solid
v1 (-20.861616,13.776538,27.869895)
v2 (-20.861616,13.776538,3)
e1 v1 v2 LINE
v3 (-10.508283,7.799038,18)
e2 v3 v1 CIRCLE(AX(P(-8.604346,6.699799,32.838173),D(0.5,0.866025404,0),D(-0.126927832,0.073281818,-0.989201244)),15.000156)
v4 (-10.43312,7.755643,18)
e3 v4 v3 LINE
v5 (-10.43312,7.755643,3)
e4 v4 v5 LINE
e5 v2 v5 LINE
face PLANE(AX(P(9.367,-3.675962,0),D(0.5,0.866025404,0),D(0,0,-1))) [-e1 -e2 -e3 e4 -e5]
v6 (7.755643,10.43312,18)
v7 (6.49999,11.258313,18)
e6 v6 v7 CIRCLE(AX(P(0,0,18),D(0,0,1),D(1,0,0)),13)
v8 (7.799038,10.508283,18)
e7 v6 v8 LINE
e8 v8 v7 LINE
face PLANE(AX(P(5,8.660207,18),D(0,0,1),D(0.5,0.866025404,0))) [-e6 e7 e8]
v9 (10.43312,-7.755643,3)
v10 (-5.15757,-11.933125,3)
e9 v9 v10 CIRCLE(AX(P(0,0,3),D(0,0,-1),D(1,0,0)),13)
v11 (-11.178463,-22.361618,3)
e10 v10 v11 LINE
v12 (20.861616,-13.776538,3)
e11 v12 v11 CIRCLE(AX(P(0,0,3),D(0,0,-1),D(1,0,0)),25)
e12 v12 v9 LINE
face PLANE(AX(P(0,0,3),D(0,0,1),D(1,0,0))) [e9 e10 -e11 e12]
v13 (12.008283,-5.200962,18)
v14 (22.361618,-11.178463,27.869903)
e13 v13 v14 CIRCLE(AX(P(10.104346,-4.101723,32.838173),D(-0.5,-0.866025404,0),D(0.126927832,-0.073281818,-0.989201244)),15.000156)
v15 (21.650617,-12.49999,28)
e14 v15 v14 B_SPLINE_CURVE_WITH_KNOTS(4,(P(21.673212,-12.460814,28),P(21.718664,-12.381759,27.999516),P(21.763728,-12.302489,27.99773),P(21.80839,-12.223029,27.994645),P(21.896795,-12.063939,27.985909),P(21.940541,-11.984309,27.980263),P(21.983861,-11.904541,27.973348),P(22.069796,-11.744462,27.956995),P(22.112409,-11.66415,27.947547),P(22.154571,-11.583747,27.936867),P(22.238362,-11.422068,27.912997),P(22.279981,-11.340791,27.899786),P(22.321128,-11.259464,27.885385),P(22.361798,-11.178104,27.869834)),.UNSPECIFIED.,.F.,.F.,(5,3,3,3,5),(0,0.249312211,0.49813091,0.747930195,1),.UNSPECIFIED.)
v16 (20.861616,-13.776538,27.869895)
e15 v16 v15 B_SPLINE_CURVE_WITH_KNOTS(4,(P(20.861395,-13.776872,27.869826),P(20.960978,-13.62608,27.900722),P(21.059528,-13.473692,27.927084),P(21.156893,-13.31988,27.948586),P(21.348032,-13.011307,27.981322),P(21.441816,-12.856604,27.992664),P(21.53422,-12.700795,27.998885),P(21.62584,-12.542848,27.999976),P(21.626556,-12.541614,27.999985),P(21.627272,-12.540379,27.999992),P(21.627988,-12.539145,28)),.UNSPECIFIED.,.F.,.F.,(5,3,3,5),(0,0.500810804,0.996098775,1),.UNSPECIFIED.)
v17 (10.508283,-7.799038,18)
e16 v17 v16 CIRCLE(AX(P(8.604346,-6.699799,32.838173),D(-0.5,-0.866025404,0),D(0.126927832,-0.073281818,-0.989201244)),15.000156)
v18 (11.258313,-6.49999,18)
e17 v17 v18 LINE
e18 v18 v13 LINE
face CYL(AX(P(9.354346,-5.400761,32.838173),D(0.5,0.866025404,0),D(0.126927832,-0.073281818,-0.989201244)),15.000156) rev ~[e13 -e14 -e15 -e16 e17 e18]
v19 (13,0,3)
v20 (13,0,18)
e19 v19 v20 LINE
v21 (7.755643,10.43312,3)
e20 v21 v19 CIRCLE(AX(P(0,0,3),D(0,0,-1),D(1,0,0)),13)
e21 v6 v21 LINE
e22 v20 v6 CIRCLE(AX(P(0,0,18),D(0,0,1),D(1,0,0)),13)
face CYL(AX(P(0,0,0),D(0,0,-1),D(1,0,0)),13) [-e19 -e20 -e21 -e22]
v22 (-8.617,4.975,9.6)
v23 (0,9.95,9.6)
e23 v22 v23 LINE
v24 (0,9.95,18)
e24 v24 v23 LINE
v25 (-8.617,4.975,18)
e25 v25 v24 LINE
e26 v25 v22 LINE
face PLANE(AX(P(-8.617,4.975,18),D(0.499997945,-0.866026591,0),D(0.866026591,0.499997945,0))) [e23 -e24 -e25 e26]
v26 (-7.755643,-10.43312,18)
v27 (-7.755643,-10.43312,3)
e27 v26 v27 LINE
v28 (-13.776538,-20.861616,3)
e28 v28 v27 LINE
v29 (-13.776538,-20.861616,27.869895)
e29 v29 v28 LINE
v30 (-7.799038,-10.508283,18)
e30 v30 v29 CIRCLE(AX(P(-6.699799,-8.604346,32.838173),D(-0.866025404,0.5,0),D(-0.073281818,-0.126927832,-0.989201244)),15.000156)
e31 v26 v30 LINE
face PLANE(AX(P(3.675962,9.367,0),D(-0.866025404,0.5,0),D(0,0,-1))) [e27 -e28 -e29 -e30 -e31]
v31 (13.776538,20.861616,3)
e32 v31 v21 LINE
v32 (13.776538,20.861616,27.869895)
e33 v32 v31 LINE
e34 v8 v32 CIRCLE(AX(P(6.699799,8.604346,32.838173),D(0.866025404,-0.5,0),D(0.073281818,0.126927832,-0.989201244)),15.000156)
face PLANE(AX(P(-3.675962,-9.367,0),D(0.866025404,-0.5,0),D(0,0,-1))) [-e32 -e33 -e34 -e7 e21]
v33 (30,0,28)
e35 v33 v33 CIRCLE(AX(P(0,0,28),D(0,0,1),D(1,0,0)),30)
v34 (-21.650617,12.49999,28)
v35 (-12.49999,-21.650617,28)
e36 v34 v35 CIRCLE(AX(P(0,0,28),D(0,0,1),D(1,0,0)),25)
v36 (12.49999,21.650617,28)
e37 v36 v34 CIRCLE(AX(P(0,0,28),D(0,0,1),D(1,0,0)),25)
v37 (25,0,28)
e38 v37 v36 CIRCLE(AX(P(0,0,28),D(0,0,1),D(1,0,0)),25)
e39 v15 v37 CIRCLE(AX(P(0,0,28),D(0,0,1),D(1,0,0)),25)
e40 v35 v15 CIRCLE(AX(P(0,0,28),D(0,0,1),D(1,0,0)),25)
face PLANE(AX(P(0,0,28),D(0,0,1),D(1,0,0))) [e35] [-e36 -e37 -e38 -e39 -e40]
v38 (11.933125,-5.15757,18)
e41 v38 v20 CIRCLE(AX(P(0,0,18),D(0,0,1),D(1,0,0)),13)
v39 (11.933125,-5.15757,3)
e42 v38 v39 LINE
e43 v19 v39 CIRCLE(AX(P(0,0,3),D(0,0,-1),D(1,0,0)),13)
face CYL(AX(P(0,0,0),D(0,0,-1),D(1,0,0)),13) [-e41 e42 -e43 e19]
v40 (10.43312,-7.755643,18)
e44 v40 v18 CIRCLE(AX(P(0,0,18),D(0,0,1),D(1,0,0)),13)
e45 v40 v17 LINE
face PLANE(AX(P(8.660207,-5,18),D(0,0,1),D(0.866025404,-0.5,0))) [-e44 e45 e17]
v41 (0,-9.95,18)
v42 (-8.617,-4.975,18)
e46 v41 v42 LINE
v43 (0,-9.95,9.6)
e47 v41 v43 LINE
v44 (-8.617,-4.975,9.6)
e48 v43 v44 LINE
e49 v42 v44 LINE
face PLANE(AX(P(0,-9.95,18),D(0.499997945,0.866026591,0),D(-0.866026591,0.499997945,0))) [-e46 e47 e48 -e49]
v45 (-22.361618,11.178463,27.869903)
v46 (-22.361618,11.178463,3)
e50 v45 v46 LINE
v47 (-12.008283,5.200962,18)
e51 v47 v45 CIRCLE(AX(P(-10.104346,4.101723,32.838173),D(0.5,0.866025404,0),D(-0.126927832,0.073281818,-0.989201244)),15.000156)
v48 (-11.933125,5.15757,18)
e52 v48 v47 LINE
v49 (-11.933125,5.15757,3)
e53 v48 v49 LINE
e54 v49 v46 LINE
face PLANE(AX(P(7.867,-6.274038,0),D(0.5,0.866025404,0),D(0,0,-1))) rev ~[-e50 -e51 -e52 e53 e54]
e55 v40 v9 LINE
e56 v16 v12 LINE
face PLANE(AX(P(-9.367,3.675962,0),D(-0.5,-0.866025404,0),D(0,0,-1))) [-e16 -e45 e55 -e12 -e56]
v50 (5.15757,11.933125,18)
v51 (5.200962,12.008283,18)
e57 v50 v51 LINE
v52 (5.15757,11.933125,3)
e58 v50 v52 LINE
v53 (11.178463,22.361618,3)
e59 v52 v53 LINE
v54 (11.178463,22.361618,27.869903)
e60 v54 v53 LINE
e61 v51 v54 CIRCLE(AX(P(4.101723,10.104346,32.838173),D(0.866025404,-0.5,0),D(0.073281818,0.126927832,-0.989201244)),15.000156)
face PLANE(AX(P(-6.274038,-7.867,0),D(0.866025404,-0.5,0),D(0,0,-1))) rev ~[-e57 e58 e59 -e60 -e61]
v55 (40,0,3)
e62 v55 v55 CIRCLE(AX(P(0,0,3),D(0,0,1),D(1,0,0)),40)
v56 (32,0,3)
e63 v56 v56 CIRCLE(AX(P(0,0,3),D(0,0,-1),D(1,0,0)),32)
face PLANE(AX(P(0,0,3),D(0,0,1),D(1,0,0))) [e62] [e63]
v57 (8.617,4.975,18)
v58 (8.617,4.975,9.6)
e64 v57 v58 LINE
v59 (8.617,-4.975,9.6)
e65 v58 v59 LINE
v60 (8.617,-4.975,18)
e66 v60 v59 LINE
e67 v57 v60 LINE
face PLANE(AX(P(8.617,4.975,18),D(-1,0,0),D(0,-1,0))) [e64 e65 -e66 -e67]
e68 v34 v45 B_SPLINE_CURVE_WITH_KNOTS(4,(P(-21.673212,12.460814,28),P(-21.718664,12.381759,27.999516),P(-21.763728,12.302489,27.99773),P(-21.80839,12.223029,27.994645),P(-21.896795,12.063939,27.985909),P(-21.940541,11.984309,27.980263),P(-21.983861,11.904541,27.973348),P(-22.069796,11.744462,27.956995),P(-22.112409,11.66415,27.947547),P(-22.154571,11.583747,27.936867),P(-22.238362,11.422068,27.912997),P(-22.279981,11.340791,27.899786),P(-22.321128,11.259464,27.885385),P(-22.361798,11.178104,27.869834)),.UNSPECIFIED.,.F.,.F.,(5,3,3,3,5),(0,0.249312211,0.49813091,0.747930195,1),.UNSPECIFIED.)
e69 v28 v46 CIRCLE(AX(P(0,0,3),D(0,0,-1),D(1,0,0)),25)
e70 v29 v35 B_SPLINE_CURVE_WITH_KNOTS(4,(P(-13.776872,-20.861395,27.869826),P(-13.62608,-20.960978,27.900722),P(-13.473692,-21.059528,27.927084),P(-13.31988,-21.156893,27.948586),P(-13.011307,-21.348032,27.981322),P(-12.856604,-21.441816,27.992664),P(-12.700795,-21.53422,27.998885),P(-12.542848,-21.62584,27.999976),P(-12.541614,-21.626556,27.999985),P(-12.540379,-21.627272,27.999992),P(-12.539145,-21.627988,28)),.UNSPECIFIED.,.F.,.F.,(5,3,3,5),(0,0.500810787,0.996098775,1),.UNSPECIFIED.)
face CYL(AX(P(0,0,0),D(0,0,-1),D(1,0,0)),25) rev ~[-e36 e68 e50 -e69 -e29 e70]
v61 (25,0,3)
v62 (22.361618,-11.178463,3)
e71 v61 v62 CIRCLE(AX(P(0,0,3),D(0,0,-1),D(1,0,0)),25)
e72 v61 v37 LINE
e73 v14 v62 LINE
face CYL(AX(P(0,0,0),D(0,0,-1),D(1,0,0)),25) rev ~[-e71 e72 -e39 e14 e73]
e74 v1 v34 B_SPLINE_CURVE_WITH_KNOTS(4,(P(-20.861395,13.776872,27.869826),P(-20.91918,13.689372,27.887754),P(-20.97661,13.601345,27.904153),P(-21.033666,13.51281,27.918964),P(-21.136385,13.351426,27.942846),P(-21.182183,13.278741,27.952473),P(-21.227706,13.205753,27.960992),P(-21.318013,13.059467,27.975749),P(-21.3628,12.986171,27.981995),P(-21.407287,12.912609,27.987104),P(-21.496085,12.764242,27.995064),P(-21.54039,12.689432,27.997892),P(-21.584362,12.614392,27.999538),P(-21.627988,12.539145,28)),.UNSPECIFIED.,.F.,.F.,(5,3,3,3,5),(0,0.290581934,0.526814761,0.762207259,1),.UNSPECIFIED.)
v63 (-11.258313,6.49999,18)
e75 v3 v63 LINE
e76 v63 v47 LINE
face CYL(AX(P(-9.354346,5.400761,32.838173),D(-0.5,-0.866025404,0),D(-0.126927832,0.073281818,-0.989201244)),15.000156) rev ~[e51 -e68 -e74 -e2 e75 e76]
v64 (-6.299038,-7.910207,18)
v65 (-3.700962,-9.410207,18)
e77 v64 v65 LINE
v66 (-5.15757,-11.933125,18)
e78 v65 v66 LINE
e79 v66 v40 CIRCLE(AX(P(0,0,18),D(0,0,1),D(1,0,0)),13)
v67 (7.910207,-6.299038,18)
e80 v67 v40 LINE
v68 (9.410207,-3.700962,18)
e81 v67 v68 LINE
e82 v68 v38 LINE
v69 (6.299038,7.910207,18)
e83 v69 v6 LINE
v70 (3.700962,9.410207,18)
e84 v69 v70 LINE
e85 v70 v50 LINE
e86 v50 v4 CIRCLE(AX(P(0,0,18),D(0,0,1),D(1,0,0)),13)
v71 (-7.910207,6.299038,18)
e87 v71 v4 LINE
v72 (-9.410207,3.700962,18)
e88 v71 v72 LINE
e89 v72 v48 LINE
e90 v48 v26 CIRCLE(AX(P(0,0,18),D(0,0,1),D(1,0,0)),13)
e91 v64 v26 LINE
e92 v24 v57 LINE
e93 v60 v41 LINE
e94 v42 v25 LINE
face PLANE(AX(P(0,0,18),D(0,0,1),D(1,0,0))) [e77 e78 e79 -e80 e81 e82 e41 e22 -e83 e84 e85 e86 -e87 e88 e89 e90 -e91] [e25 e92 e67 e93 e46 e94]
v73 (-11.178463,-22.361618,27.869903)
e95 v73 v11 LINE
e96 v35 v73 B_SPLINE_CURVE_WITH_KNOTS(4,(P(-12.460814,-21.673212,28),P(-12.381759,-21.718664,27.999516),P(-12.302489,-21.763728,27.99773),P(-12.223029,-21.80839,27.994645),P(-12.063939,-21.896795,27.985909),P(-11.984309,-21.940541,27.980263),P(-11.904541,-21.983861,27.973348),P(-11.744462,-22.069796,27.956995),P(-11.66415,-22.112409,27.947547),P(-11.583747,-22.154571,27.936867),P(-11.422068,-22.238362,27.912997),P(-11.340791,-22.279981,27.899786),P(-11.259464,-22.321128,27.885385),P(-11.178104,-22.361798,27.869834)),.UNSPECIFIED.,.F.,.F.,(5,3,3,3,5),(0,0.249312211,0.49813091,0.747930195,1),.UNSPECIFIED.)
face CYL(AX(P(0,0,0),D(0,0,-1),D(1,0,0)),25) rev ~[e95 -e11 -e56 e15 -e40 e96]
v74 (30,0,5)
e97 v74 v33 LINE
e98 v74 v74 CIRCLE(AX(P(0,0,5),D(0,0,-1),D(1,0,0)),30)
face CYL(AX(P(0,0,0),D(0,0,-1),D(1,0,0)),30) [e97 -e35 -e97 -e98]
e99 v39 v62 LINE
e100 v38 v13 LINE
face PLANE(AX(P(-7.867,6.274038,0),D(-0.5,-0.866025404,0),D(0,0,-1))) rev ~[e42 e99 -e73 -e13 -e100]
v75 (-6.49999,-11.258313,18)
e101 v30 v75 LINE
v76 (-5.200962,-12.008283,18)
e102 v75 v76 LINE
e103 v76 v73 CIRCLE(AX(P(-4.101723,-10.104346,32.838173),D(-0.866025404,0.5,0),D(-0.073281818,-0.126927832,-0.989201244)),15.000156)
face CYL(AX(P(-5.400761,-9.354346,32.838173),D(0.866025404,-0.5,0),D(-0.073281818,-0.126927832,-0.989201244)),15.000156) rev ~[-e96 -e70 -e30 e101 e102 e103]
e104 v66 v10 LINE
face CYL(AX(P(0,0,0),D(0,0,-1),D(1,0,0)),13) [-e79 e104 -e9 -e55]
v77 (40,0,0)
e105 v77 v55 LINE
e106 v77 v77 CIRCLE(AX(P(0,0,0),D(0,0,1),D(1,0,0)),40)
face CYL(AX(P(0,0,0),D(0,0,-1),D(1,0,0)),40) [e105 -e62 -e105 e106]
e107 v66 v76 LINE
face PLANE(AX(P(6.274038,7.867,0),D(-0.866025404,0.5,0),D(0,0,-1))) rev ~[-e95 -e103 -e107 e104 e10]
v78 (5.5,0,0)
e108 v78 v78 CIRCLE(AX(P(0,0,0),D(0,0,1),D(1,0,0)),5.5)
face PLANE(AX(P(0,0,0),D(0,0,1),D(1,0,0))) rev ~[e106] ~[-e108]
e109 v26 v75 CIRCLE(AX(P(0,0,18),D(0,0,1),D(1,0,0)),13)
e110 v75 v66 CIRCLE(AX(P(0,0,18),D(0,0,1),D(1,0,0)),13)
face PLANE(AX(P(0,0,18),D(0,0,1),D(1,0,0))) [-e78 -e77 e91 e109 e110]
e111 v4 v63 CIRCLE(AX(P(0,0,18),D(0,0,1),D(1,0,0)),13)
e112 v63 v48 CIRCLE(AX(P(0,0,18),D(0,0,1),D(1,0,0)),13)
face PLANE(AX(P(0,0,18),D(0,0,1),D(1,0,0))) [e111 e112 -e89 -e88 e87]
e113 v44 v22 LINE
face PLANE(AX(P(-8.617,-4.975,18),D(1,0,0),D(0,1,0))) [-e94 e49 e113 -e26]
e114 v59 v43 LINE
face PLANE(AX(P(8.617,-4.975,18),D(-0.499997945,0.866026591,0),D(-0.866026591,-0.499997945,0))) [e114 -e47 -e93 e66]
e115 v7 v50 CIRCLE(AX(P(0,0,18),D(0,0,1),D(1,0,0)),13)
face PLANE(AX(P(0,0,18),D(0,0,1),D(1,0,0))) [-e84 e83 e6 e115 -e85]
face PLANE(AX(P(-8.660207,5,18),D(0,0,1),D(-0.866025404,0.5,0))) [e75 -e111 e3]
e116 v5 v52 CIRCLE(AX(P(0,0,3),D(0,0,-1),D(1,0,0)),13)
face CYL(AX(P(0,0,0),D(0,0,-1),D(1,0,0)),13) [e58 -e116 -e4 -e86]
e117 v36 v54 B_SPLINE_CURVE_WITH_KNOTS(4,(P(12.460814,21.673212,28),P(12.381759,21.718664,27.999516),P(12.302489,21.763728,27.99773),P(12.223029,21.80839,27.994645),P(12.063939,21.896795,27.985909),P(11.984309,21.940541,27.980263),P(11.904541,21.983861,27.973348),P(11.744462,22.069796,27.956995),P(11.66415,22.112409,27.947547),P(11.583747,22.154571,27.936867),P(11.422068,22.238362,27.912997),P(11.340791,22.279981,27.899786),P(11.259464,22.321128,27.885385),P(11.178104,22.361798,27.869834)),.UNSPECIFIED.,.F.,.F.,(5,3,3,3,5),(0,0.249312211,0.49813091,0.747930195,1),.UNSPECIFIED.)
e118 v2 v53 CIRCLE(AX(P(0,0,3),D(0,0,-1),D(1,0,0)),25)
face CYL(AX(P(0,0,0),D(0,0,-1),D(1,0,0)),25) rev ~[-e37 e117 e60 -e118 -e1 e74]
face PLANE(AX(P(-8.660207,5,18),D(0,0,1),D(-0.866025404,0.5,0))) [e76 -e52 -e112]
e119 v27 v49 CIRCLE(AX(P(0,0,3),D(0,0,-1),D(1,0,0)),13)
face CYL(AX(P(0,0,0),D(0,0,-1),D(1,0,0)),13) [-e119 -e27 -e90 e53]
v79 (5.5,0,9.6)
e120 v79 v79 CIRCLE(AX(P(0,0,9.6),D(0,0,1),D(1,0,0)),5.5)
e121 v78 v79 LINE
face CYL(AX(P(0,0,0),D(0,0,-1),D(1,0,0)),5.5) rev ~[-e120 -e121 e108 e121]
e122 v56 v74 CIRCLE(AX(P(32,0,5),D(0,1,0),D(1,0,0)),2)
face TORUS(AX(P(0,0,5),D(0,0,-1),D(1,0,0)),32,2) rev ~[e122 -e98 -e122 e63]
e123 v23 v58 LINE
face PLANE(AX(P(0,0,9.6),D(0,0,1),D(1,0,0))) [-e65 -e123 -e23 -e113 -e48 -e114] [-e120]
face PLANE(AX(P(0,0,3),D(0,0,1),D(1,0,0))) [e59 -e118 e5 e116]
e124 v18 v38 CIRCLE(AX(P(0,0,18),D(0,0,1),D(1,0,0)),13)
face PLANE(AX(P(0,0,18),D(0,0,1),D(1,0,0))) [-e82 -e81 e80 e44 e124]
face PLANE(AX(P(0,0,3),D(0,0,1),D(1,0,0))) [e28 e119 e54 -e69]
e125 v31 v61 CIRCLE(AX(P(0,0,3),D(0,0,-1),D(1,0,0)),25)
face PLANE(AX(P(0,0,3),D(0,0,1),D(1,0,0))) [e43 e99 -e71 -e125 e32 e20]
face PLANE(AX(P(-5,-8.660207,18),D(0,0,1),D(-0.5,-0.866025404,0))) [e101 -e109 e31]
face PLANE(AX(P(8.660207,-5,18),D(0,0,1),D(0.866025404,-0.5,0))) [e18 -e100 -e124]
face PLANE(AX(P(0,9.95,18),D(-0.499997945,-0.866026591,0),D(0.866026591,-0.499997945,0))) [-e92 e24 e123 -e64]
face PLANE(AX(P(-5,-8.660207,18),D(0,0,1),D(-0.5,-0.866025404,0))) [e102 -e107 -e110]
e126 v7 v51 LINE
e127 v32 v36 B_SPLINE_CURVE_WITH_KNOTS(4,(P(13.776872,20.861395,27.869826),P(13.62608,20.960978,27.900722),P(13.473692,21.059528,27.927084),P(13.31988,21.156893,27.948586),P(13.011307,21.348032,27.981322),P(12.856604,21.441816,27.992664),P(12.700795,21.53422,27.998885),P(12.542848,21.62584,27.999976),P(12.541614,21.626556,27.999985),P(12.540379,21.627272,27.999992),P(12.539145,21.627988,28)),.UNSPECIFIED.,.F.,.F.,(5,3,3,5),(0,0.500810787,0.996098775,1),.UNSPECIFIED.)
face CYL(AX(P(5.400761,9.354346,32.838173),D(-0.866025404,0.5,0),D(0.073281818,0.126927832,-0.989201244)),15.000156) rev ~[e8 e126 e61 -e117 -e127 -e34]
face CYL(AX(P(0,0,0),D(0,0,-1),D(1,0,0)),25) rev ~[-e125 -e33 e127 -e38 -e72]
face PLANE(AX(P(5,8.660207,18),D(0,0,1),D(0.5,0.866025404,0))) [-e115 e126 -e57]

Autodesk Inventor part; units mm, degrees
ref_plane "YZ Plane" through (0, 0, 0) normal (1, 0, 0) x (0, 1, 0)
ref_plane "XZ Plane" through (0, 0, 0) normal (0, 1, 0) x (-1, 0, 0)
sketch "Sketch1" plane through (0, 0, 0) normal (0, 0, 1) x (1, 0, 0)
  circle A0 centre (0, 0) radius 30
  circle A1 centre (0, 0) radius 40
  circle A2 centre (0, 0) radius 25
  circle A3 centre (0, 0) radius 13
  circle A4 centre (0, 0) radius 5.5
  circle A5 centre (0, 0) radius 9.95 construction
  line L0 (0, 9.95) -> (8.617, 4.975)
  line L1 (8.617, 4.975) -> (8.617, -4.975)
  line L2 (8.617, -4.975) -> (0, -9.95)
  line L3 (0, -9.95) -> (-8.617, -4.975)
  line L4 (-8.617, -4.975) -> (-8.617, 4.975)
  line L5 (-8.617, 4.975) -> (0, 9.95)
  line L6 (0, 9.95) -> (0, -9.95) construction
  dimension "bolt_head_hub_WAC" = 19.9
  dimension "wheel_diam" = 60
  dimension "d1" = 80
  dimension "d4" = 50
  dimension "d5" = 26
  dimension "hub_id" = 11
extrude "Extrusion1" add sketch "Sketch1" along normal blind 3 contours A0 | A1 | A2 | A3 | A4 | L0 L1 L2 L3 L4 L5
extrude "Extrusion2" add sketch "Sketch1" along normal blind 28 contours A0
extrude "Extrusion3" add sketch "Sketch1" along normal blind 18 contours A3 | L0 L1 L2 L3 L4 L5
extrude "Extrusion4" cut sketch "Sketch1" against normal blind 8.4 from surface at 18 contours L0 L1 L2 L3 L4 L5
extrude "Extrusion5" cut sketch "Sketch1" along normal up to surface (3 mm away) contours A4
fillet "Fillet1" radius 2 1 edges at (-30, 0, 3)
ref_plane "Work Plane1" through (-8.617, 4.975, 0) normal (-0.5, -0.8660254, 0) x (0, 0, -1)
sketch "Sketch3" plane through (-8.617, 4.975, 0) normal (-0.5, -0.8660254, 0) x (0, 0, -1)
  line L0 (-3, 22.95) -> (-18, 22.95) projected
  line L1 (-3, 34.95) -> (-3, -15.05) projected
  line L2 (-3, -3.05) -> (-3, 22.95) projected
  line L3 (-28, 34.95) -> (-3, 34.95) projected
  line L4 (-18, 22.95) -> (-3, 22.95)
  line L5 (-3, 22.95) -> (-3, 19.95)
  line L6 (-3, 19.95) -> (-18, 19.95)
  line L7 (-18, 19.95) -> (-18, 22.95)
  arc A0 (-18, 22.95) -> (-28, 34.95) centre (-32.838, 20.7516) ccw
  point P0 (0, 9.95)
  dimension "d18" = 3
  dimension "d21" = 15
extrude "Extrusion6" add sketch "Sketch3" along normal mid plane 3
pattern_circular "Circular Pattern1" count 4 over 360 about axis through (0, 0, -10) along (0, 0, 1) of "Extrusion6"
equation "\"bolt_head_hub_WAC\" = bolt_WAC + 2 * printer_tolerance"
equation "\"d1\" = wheel_diam + 2 * flange_extra"
equation "\"d4\" = wheel_diam - 2 * wheel_thick"
equation "\"d5\" = bolt_head_hub_WAC + 2 * bolt_head_hub_clearance"
equation "\"hub_id\" = bolt_od + 2 * printer_tolerance"
equation "\"d8\" = track_w + flange_w"
equation "\"d10\" = flange_w + hub_height"
equation "\"track_w\" = 25"
equation "\"wheel_thick\" = 5"
equation "\"bolt_head_hub_clearance\" = 3.05"
equation "\"hub_height\" = 15"
equation "\"bolt_head_thick\" = 6.4"
equation "\"bolt_WAC\" = 18.9"
equation "\"printer_tolerance\" = 0.5"
equation "\"flange_extra\" = 10"
equation "\"bolt_od\" = 10"
equation "\"flange_w\" = 3"
properties part number "test_wheel_v2"
